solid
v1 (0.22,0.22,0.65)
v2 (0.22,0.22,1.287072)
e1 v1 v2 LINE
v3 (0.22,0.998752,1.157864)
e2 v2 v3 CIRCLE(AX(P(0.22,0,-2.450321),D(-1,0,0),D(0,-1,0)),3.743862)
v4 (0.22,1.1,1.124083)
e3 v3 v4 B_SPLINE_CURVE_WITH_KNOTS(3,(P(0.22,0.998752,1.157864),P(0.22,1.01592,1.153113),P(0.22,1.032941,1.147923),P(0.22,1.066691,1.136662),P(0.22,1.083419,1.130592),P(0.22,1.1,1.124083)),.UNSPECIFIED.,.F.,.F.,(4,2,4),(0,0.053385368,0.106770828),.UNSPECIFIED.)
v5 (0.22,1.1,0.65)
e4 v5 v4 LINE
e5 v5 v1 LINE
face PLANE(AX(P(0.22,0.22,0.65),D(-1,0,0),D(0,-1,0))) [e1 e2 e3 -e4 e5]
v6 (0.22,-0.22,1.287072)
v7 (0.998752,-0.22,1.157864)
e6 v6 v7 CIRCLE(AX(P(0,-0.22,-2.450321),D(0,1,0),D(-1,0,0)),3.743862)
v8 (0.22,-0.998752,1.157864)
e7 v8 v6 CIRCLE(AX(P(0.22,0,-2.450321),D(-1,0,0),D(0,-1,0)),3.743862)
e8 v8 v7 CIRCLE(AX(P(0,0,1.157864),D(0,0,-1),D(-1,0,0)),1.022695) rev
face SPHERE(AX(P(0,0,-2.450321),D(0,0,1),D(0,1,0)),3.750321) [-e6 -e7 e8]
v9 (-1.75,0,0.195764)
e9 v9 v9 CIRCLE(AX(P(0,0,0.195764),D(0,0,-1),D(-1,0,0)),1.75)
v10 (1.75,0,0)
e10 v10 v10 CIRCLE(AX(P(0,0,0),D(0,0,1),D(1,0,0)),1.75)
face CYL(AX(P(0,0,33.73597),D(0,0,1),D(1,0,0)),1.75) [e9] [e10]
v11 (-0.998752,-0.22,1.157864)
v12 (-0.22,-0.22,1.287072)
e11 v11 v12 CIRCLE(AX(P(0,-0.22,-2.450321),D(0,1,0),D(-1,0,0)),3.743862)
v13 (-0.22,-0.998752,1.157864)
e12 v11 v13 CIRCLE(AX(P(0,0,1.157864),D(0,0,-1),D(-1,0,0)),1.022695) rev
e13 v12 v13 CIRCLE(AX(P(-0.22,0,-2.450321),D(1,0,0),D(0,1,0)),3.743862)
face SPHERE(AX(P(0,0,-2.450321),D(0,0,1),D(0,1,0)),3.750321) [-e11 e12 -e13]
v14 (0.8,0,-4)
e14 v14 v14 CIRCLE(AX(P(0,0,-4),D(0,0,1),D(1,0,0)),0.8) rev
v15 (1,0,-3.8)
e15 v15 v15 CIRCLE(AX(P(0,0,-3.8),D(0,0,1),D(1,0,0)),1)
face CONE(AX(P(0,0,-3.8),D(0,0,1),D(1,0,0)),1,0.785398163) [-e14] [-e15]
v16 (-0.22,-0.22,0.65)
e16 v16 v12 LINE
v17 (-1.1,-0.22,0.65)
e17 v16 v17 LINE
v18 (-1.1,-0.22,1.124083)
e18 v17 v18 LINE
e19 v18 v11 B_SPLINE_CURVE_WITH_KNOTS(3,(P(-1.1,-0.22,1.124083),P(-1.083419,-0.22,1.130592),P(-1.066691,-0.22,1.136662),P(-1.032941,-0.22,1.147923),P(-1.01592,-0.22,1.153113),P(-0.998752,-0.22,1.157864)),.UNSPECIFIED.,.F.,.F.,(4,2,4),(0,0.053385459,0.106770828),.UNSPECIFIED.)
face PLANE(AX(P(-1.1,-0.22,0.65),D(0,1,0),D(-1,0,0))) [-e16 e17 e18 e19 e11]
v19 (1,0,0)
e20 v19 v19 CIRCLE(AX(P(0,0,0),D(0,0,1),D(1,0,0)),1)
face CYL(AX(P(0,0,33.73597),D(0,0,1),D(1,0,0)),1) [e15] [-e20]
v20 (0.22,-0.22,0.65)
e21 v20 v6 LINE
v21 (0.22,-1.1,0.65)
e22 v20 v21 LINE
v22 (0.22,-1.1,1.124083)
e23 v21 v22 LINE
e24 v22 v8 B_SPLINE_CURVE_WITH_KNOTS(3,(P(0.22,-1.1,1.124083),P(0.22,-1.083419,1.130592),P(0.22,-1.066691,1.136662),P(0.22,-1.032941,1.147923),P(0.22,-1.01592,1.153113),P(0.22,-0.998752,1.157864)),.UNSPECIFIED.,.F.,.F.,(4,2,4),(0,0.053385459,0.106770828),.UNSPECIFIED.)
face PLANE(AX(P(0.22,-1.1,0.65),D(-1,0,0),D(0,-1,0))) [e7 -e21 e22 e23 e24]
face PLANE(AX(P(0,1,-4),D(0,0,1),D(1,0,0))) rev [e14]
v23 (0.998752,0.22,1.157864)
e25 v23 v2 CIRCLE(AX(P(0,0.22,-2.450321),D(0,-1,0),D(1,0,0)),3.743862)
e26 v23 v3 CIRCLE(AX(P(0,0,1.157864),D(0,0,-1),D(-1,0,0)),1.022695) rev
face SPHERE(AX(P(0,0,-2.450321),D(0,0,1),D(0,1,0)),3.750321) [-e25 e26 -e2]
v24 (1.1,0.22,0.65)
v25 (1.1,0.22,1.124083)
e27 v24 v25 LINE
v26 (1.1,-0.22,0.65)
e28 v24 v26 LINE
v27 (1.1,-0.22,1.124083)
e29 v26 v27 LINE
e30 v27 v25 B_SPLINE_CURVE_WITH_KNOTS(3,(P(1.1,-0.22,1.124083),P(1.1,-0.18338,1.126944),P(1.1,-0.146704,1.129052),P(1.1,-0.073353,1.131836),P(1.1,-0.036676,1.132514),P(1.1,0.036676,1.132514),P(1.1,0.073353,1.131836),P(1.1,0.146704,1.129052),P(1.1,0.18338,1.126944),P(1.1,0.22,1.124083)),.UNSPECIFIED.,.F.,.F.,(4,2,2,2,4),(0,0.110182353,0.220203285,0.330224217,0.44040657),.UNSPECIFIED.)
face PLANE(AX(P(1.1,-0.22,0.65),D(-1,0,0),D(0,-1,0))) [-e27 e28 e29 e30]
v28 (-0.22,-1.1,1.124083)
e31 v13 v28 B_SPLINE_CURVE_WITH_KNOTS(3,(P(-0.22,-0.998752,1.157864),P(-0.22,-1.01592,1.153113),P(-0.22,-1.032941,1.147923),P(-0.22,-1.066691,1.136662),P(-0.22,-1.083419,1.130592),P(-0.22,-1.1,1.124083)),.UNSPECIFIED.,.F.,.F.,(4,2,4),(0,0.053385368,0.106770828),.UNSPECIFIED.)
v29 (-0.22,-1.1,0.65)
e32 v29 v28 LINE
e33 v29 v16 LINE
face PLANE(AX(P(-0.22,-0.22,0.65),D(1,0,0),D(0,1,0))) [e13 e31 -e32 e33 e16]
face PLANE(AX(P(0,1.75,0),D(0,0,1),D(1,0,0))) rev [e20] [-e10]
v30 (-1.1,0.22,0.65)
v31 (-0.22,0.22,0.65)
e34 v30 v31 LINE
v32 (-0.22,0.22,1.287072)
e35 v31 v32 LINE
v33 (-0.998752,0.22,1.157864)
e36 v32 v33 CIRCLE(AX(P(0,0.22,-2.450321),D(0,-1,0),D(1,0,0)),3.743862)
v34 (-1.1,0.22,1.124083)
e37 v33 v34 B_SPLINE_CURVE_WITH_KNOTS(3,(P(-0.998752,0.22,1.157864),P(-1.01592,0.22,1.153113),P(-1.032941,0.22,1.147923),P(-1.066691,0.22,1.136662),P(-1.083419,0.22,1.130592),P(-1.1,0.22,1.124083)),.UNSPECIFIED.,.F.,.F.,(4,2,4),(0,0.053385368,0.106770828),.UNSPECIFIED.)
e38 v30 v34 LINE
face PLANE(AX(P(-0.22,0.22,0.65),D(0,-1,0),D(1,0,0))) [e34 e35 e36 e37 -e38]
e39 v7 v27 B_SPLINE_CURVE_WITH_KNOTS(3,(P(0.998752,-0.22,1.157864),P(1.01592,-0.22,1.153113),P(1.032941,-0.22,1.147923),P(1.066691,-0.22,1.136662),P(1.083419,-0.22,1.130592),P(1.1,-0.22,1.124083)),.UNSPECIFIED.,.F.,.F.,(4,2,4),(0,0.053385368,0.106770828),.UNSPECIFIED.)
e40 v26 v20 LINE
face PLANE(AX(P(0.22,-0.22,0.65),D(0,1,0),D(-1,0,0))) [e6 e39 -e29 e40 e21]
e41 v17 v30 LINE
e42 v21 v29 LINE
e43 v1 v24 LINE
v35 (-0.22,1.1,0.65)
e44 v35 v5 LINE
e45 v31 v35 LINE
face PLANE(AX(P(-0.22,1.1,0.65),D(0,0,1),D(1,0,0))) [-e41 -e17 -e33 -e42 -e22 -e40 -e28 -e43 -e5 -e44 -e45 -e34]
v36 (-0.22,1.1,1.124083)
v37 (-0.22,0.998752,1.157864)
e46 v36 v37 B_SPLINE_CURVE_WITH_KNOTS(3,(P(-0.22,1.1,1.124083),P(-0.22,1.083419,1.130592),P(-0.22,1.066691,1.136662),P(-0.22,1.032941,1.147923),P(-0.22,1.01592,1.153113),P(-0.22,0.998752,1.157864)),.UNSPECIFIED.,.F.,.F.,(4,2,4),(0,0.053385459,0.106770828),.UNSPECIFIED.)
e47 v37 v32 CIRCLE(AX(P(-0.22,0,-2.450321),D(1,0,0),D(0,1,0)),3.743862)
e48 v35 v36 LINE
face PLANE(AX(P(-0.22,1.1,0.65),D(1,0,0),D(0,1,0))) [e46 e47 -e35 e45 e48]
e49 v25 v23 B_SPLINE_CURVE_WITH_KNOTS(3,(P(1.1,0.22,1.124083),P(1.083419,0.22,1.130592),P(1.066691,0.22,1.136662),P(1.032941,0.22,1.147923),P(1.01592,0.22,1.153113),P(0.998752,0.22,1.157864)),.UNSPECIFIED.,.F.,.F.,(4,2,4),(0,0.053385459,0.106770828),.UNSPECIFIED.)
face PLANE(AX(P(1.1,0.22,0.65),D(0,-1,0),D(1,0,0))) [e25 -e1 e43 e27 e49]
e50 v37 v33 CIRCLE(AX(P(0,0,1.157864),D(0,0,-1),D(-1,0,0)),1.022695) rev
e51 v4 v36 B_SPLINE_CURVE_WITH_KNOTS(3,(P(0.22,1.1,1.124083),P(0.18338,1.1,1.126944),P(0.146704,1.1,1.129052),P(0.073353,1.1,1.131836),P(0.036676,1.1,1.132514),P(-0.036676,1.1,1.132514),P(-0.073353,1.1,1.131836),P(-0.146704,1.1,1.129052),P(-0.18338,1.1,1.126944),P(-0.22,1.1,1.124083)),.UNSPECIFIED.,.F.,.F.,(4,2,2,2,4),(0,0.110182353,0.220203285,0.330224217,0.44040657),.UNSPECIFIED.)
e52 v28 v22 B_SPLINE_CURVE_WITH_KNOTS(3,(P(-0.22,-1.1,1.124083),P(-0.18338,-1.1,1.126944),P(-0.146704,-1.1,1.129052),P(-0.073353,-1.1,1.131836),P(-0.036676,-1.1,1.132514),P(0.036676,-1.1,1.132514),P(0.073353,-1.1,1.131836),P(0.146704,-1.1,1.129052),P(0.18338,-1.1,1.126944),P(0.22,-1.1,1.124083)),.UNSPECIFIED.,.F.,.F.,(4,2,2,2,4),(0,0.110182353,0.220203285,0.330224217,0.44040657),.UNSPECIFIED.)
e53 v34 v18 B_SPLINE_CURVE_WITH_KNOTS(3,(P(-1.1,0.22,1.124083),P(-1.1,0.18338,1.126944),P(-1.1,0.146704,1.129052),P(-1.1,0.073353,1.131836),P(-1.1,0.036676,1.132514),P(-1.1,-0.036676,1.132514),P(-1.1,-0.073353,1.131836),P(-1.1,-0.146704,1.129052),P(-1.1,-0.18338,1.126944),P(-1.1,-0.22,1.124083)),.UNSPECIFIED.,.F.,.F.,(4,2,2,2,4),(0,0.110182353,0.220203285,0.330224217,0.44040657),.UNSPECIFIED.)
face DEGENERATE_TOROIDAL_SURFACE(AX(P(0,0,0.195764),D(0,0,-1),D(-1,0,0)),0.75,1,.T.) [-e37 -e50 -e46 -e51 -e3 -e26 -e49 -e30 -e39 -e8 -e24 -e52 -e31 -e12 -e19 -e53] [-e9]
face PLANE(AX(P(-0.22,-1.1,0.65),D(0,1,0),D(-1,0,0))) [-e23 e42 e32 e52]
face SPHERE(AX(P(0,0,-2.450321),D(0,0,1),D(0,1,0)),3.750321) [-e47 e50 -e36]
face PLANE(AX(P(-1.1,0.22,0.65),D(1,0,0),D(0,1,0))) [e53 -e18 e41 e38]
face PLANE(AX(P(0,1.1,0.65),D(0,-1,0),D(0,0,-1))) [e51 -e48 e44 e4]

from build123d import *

# Parameters (mm, degrees)
CUT_EXTRUDE2_DEPTH = 0.65
CHAMFER1_SIZE      = 0.2


with BuildPart() as part:
    # Sketch1 → Revolve1 (revolve)
    with BuildSketch(Plane(origin=(0, 0, 0), x_dir=(0, 0, -1), z_dir=(1, 0, 0)), mode=Mode.PRIVATE) as revolve1_sk:
        with BuildLine():
            Line((-0.866666667, 1.75), (0, 1.75))
            Line((0, 1.75), (0, 1))
            Line((0, 1), (4, 1))
            Line((4, 1), (4, 0))
            Line((4, 0), (-1.3, 0))
            ThreePointArc((-1.3, 0), (-1.190055087, 0.901426339), (-0.866666667, 1.75))
        make_face()
    revolve(revolve1_sk.sketch.rotate(Axis((0, 0, 33.735969773), (0, 0, -1)), 90), axis=Axis((0, 0, 33.735969773), (0, 0, -1)))

    # Sketch2 → Cut-Extrude2 (cut)
    with BuildSketch(Plane(origin=(0, 0, 1.3), x_dir=(-1, 0, 0), z_dir=(0, 0, -1))):
        Polygon((0, 1.1), (0.22, 1.1), (0.22, 0.22), (1.1, 0.22), (1.1, 0), (1.1, -0.22), (0.22, -0.22), (0.22, -1.1), (0, -1.1), (-0.22, -1.1), (-0.22, -0.22), (-1.1, -0.22), (-1.1, 0), (-1.1, 0.22), (-0.22, 0.22), (-0.22, 1.1), align=None)
    extrude(amount=CUT_EXTRUDE2_DEPTH, mode=Mode.SUBTRACT)

    # Fillet1: read off the stored shape, not the designer's step
    # Fillet1 outline → Fillet1 (revolve, cut)
    with BuildSketch(Plane.XZ):
        with BuildLine():
            Line((1.75, 1.157864333), (1.02269549, 1.157864333))
            ThreePointArc((1.02269549, 1.157864333), (1.547714075, 0.798799804), (1.75, 0.195763938))
            Line((1.75, 0.195763938), (1.75, 1.157864333))
        make_face()
    revolve(axis=Axis((0, 0, 0), (0, 0, 1)), mode=Mode.SUBTRACT)

    # Chamfer1
    chamfer1_edges = [part.edges().sort_by_distance(p)[0] for p in [
        (-1, 0, -4),
    ]]
    chamfer(chamfer1_edges, length=CHAMFER1_SIZE)


solid = part.part
